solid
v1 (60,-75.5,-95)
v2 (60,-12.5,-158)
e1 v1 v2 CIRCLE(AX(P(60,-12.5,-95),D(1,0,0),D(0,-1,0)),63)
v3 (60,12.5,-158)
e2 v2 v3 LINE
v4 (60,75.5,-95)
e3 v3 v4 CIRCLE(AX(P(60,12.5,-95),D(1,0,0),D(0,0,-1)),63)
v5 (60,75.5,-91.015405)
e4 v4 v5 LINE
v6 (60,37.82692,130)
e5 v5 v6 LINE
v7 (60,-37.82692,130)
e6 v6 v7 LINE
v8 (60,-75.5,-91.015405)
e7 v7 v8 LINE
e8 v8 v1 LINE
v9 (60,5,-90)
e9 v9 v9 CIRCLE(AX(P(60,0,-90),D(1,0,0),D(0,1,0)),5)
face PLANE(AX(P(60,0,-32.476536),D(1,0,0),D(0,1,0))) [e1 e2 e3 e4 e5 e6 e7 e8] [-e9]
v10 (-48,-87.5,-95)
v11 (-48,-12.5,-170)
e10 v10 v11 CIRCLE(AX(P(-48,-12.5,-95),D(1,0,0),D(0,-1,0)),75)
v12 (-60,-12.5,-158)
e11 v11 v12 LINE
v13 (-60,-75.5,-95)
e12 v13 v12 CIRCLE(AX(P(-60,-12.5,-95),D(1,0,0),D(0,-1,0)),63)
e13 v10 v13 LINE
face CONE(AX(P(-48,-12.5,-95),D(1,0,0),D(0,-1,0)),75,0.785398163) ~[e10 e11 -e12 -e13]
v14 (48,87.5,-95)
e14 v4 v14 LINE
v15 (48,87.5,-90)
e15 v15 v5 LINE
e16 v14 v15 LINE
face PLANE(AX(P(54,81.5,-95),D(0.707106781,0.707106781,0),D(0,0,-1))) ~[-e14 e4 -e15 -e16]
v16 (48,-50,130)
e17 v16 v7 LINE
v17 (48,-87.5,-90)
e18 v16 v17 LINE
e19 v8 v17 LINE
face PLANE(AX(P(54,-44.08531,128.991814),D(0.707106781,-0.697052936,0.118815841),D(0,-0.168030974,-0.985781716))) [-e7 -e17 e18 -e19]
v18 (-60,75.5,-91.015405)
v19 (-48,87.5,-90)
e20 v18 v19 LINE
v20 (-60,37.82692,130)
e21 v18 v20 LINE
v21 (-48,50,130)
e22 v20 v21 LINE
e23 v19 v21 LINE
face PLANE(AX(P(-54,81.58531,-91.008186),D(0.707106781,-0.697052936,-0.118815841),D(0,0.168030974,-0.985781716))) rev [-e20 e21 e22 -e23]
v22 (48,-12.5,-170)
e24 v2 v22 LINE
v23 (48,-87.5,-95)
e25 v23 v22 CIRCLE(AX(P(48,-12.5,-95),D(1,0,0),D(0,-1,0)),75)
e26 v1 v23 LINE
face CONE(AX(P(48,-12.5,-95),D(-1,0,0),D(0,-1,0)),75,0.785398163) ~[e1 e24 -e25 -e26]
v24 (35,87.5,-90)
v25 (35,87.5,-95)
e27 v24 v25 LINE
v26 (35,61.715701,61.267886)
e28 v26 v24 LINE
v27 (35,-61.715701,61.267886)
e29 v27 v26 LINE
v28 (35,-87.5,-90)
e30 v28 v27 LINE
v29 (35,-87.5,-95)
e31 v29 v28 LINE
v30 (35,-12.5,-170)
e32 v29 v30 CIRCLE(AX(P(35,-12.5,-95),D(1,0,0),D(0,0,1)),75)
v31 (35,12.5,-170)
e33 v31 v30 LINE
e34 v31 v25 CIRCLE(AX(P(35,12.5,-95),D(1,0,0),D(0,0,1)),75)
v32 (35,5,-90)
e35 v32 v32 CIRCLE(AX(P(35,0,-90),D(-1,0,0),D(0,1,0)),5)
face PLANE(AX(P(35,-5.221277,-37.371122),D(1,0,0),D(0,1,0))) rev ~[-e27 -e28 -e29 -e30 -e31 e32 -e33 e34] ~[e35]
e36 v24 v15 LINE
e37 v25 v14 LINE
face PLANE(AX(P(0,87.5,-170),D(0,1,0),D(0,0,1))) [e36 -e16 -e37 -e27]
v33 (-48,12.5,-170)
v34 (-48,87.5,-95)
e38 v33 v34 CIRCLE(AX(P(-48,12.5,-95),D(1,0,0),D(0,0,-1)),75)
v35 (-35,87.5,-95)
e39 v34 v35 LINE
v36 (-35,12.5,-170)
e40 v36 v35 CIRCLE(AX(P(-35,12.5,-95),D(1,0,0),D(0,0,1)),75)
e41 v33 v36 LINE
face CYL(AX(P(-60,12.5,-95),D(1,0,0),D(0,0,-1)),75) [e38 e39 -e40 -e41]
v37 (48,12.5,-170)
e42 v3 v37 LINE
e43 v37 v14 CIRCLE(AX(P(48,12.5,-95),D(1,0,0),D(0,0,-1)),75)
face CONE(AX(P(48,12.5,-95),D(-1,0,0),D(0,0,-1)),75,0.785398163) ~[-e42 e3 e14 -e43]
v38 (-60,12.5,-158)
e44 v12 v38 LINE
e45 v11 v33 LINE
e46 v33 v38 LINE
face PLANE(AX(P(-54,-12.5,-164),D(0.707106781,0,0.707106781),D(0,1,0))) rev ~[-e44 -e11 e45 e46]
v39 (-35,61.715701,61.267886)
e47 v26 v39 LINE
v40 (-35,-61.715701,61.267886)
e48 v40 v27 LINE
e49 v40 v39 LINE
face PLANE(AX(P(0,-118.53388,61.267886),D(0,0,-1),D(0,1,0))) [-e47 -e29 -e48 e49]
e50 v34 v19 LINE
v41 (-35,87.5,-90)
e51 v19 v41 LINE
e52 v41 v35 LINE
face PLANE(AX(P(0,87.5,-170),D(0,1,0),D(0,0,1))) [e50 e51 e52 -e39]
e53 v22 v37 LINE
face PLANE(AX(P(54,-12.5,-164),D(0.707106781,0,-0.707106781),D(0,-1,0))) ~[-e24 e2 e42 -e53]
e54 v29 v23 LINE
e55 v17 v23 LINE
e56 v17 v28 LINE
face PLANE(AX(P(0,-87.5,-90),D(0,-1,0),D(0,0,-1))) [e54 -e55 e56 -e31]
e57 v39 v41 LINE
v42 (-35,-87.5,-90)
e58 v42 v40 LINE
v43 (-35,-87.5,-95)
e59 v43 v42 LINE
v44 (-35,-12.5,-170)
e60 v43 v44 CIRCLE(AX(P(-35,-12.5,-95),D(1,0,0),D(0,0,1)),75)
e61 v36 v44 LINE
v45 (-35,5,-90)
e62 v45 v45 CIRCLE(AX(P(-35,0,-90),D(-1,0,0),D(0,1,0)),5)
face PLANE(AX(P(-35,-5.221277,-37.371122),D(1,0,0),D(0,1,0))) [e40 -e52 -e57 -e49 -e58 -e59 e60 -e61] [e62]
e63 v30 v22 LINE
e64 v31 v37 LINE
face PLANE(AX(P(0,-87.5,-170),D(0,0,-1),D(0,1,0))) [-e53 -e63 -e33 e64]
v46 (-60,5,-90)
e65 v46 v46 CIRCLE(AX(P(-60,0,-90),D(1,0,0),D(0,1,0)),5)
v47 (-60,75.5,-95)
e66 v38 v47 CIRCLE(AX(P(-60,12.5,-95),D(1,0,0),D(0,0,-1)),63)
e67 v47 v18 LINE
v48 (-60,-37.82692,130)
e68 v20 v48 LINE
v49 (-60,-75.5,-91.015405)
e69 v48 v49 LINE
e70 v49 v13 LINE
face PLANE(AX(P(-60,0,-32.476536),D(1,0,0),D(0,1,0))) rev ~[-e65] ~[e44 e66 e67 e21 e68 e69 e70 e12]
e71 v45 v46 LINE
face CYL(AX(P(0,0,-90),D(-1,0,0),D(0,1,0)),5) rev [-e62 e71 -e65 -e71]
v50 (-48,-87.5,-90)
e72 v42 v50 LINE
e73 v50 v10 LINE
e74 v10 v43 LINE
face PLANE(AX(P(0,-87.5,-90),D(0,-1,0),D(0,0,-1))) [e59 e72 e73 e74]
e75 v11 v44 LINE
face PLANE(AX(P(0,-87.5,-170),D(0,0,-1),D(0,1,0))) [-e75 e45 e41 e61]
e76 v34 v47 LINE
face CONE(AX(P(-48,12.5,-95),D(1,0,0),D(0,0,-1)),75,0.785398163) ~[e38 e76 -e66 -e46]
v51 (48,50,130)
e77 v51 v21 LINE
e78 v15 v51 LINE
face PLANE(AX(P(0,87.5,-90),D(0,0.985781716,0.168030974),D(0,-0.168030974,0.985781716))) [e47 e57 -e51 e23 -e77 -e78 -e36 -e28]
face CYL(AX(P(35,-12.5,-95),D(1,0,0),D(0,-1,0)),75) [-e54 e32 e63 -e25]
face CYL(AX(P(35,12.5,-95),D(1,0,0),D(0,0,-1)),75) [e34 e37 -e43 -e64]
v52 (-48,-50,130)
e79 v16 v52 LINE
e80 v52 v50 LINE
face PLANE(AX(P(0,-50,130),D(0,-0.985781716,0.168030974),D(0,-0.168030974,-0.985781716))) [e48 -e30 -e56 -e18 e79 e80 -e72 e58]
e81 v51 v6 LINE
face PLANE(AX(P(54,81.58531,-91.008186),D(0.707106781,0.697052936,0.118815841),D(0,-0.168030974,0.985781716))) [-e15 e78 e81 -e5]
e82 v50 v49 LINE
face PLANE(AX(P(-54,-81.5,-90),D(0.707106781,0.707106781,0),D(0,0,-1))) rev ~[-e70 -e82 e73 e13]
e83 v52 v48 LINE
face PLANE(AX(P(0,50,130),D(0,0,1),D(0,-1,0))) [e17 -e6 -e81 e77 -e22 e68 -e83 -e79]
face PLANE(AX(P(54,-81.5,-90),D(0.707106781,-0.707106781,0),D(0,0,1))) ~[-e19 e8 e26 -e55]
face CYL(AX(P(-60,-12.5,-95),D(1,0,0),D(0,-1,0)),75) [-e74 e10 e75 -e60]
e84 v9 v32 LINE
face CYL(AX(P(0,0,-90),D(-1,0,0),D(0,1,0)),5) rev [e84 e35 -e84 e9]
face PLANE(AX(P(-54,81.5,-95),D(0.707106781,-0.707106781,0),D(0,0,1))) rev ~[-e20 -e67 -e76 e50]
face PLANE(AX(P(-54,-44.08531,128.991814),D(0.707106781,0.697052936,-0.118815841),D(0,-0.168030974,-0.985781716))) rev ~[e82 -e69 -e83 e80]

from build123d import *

# Parameters (mm, degrees)
F0_R     = 5
F1_DEPTH = 60
F3_W     = 226.6252040863
F3_H     = 197.2780163714
F3_H_2   = 59.4672214857
F4_DEPTH = 35
F5_R     = 75
F6_SIZE  = 12


# Not quite as in the source:
# - a feature names something its author has since deleted; it is built from what else it names


with BuildPart() as f1:
    # F0 (on Right) → F1 (new body, symmetric)
    with BuildSketch(Plane.YZ):
        Polygon((-87.5, -90), (-87.5, -170), (87.5, -170), (87.5, -90), (50, 130), (-50, 130), align=None)
        with Locations((0, -90)):
            Circle(F0_R, mode=Mode.SUBTRACT)
    extrude(amount=F1_DEPTH, both=True)

    # F3 (on face) → F4 (cut, symmetric)
    with BuildSketch(Plane.YZ):
        with Locations((-5.2212774754, -37.3711218749)):
            Rectangle(F3_W, F3_H)
        with Locations((-5.2212774754, -165.7437408035)):
            Rectangle(F3_W, F3_H_2)
    extrude(amount=F4_DEPTH, both=True, mode=Mode.SUBTRACT)

    # F5
    f5_edges = [f1.edges().sort_by_distance(p)[0] for p in [
        (-47.5, 87.5, -170),
        (47.5, 87.5, -170),
        (47.5, -87.5, -170),
        (-47.5, -87.5, -170),
    ]]
    fillet(f5_edges, radius=F5_R)

    # F6
    f6_edges = [f1.edges().sort_by_distance(p)[0] for p in [
        (60, 68.75, 20),
        (-60, 68.75, 20),
        (60, -65.533009, -148.033009),
        (60, -68.75, 20),
        (-60, -65.533009, -148.033009),
        (-60, -68.75, 20),
    ]]
    chamfer(f6_edges, length=F6_SIZE)


solid = f1.part
